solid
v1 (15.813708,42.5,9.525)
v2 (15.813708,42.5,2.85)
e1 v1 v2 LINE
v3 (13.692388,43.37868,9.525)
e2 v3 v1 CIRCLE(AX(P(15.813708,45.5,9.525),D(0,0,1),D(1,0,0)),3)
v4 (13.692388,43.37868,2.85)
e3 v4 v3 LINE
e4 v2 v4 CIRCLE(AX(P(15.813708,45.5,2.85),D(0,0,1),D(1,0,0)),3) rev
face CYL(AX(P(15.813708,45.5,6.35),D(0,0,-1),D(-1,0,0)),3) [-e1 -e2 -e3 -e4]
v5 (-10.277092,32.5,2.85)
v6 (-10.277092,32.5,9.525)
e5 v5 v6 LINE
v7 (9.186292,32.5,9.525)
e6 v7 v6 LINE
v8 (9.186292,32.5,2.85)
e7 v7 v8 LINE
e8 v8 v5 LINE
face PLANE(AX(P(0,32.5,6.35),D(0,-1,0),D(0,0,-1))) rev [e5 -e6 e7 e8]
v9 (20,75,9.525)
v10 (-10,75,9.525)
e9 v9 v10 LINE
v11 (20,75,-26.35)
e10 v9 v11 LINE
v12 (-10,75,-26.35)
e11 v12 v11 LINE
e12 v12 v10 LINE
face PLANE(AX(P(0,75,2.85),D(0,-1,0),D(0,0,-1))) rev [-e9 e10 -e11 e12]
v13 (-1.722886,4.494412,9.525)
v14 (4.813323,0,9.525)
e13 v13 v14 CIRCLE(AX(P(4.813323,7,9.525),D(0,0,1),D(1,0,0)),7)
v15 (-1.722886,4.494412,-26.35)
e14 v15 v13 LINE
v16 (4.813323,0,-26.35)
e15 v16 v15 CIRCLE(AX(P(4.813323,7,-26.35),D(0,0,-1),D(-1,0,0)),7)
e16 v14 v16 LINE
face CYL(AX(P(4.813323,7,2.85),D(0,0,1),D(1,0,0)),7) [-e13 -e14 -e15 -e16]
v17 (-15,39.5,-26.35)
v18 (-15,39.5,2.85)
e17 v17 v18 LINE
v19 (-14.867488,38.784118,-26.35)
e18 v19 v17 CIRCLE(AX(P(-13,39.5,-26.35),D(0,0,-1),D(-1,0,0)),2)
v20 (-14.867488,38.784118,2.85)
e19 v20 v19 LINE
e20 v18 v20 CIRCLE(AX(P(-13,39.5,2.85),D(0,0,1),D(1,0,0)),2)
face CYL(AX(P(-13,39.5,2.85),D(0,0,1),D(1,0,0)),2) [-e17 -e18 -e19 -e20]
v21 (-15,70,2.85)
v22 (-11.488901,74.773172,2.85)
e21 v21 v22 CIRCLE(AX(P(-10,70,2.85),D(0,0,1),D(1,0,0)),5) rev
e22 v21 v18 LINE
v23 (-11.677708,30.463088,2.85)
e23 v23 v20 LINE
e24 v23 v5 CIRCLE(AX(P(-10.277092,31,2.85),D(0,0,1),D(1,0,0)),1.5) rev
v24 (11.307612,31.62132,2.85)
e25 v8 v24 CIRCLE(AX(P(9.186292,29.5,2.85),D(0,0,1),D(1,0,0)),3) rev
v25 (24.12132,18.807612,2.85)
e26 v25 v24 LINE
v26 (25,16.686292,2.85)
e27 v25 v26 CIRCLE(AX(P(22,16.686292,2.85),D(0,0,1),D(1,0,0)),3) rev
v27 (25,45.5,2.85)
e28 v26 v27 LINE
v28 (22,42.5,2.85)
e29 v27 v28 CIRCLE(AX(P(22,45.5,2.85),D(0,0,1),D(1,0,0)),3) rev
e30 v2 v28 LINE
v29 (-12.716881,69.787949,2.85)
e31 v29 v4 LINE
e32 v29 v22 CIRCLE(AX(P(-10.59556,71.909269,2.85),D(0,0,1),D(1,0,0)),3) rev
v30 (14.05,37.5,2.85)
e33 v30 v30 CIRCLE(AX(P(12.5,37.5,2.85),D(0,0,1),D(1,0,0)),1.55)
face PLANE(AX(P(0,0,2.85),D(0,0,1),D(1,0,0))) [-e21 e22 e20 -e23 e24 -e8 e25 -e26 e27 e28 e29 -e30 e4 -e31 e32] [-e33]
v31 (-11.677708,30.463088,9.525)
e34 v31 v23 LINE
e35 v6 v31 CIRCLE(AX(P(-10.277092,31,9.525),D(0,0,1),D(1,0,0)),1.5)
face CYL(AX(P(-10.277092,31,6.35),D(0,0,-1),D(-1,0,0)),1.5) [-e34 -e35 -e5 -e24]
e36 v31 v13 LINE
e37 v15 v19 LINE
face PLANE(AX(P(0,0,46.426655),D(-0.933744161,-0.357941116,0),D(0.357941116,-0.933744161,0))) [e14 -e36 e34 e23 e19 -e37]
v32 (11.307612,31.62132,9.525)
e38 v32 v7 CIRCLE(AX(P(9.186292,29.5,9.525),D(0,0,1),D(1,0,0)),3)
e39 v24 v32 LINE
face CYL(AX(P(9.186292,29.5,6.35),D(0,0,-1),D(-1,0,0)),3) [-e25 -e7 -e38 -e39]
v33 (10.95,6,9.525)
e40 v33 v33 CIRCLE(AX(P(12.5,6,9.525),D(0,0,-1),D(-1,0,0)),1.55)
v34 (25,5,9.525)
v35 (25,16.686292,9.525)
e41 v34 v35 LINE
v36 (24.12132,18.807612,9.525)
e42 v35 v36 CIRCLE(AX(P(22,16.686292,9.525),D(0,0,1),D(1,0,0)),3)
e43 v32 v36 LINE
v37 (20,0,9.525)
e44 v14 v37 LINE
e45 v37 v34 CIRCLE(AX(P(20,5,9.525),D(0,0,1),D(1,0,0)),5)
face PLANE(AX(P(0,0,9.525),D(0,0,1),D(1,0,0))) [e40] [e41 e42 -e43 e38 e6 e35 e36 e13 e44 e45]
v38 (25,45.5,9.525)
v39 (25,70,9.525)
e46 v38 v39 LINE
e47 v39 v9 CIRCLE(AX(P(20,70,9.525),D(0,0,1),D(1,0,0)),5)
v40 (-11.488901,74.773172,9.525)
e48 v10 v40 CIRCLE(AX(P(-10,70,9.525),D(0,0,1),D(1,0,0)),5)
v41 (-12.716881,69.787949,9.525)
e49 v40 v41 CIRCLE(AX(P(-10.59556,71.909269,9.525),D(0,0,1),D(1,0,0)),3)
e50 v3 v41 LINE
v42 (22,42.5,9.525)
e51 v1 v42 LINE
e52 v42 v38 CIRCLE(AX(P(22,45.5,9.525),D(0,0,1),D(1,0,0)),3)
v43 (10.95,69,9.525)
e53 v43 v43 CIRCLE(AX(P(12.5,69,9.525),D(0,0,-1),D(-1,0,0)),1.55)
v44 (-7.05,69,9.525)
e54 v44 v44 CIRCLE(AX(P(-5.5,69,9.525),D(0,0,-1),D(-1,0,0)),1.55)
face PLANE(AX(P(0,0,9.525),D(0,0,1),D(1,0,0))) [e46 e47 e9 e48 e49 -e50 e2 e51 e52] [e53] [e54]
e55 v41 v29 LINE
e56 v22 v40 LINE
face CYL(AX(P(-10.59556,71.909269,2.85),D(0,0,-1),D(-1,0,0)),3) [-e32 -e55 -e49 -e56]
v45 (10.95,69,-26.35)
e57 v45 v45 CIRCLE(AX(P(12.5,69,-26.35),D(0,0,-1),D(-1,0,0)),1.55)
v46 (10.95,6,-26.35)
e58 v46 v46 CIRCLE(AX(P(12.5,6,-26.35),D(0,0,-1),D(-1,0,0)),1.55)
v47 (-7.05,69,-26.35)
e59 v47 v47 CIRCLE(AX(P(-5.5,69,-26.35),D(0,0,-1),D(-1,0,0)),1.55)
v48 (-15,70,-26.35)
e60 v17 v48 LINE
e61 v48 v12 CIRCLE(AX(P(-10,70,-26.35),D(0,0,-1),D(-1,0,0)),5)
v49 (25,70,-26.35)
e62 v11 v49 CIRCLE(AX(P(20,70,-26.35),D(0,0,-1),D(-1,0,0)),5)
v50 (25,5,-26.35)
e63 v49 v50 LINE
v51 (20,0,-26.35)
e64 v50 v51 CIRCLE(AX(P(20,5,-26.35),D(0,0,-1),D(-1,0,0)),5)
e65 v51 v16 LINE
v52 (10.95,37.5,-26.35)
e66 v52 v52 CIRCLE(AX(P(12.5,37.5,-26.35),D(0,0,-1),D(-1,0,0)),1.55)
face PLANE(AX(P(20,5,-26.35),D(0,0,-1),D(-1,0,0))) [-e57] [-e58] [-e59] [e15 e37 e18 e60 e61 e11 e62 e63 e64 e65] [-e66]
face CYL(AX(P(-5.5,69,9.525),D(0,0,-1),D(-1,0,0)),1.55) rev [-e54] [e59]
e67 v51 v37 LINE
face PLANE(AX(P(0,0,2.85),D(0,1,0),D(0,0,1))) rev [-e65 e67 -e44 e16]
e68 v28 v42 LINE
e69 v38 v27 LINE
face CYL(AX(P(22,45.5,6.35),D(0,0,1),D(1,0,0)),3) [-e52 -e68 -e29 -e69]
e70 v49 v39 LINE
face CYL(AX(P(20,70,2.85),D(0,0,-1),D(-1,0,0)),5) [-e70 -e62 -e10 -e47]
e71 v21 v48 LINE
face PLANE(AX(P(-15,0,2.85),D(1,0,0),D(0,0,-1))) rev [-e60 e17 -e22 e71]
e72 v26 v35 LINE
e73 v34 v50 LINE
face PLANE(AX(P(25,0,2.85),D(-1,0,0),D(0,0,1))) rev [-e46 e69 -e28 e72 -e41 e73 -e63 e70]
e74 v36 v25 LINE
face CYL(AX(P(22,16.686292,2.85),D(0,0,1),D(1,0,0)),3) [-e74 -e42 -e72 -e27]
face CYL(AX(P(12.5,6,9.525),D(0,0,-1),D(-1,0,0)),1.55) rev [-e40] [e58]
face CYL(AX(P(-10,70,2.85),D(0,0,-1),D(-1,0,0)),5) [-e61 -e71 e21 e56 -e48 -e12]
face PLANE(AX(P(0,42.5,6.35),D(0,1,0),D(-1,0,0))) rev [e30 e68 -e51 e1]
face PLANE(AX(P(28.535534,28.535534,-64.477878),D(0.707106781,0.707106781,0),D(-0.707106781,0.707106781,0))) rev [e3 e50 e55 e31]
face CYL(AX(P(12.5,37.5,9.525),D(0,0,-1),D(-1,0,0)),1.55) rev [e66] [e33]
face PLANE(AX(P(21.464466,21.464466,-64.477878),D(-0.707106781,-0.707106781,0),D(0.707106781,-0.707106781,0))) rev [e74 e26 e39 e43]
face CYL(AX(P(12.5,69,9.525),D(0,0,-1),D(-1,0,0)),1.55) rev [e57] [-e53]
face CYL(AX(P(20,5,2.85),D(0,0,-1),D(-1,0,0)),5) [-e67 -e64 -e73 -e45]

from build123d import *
from build123d.topology import SkipClean

# Parameters (mm, degrees)
SKETCH1_R           = 1.5
SKETCH1_W           = 15
SKETCH1_H           = 37.5
BOSS_EXTRUDE1_DEPTH = 2.85
FILLET1_R           = 5
FILLET2_R           = 2
BOSS_EXTRUDE2_START = 3.5
SKETCH5_R           = 1.5
BOSS_EXTRUDE2_DEPTH = 3.5
FILLET3_R           = 3.5
FILLET4_R           = 2
FILLET5_R           = 2
SKETCH6_R           = 1.5
CUT_EXTRUDE1_DEPTH  = 10
SKETCH8_R           = 1.5
BOSS_EXTRUDE3_DEPTH = 6.35
BOSS_EXTRUDE4_START = 3.175
SKETCH9_R           = 1.5
BOSS_EXTRUDE4_DEPTH = 3.175
SKETCH10_W          = 40
SKETCH10_H          = 15.399494937
SKETCH10_W_2        = 25
BOSS_EXTRUDE5_DEPTH = 6.675
CUT_EXTRUDE2_START  = -6.675
CUT_EXTRUDE2_DEPTH  = 6.675
BOSS_EXTRUDE6_START = -9.2
BOSS_EXTRUDE6_DEPTH = 9.2
FILLET6_R           = 7
BOSS_EXTRUDE7_DEPTH = 6.675
FILLET7_R           = 3
FILLET8_R           = 1.5
SKETCH14_R          = 1.5
CUT_EXTRUDE3_DEPTH  = 81.63507689
SKETCH15_R          = 1.55
CUT_EXTRUDE4_DEPTH  = 81.63507689
BOSS_EXTRUDE8_START = 20
SKETCH16_R          = 1.55
BOSS_EXTRUDE8_DEPTH = 20


# Read off the part's stored shape, not the designer's step: Cut-Extrude2
with BuildPart() as part:
    # Sketch1 → Boss-Extrude1 (new body)
    # profile 1 of 2: a face of its own
    with BuildSketch(Plane.XY):
        Polygon((0, 37.5), (0, 0), (25, 0), (25, 75), (0, 75), align=None)
        with Locations((12.5, 6)):
            Circle(SKETCH1_R, mode=Mode.SUBTRACT)
        with Locations((12.5, 37.5)):
            Circle(SKETCH1_R, mode=Mode.SUBTRACT)
        with Locations((12.5, 69)):
            Circle(SKETCH1_R, mode=Mode.SUBTRACT)
    # profile 2 of 2: a face of its own
    with BuildSketch(Plane.XY):
        with Locations((-7.5, 56.25)):
            Rectangle(SKETCH1_W, SKETCH1_H)
    extrude(amount=BOSS_EXTRUDE1_DEPTH)

    # Fillet1
    fillet1_edges = [part.edges().sort_by_distance(p)[0] for p in [
        (25, 75, 1.425),
        (25, 0, 1.425),
        (0, 0, 1.425),
        (0, 37.5, 1.425),
        (-15, 75, 1.425),
    ]]
    fillet(fillet1_edges, radius=FILLET1_R)

    # Fillet2
    fillet2_edges = [part.edges().sort_by_distance(p)[0] for p in [
        (-15, 37.5, 1.425),
    ]]
    fillet(fillet2_edges, radius=FILLET2_R)

    # Sketch5 → Boss-Extrude2 (add)
    # profile 1 of 2: a face of its own
    with BuildSketch(Plane.XY.offset(2.85).offset(BOSS_EXTRUDE2_START)):
        with BuildLine():
            Line((-15, 42.5), (10.428932188, 42.5))
            Line((10.428932188, 42.5), (21.464466094, 53.535533906))
            Line((21.464466094, 53.535533906), (25, 57.071067812))
            Line((25, 57.071067812), (25, 70))
            ThreePointArc((25, 70), (23.535533906, 73.535533906), (20, 75))
            Line((20, 75), (-10, 75))
            ThreePointArc((-10, 75), (-13.535533906, 73.535533906), (-15, 70))
            Line((-15, 70), (-15, 42.5))
        make_face()
        with Locations((12.5, 69)):
            Circle(SKETCH5_R, mode=Mode.SUBTRACT)
    # profile 2 of 2: a face of its own
    with BuildSketch(Plane.XY.offset(2.85).offset(BOSS_EXTRUDE2_START)):
        with BuildLine():
            Line((14.571067812, 32.5), (0, 17.928932188))
            Line((0, 17.928932188), (0, 5))
            ThreePointArc((0, 5), (1.464466094, 1.464466094), (5, 0))
            Line((5, 0), (20, 0))
            ThreePointArc((20, 0), (23.535533906, 1.464466094), (25, 5))
            Line((25, 5), (25, 32.5))
            Line((25, 32.5), (14.571067812, 32.5))
        make_face()
        with Locations((12.5, 6)):
            Circle(SKETCH5_R, mode=Mode.SUBTRACT)
    extrude(amount=-BOSS_EXTRUDE2_DEPTH)

    # Fillet3
    fillet3_edges = [part.edges().sort_by_distance(p)[0] for p in [
        (10.428932188, 42.5, 4.6),
        (14.571067812, 32.5, 4.6),
    ]]
    fillet(fillet3_edges, radius=FILLET3_R)

    # Fillet4
    fillet4_edges = [part.edges().sort_by_distance(p)[0] for p in [
        (-15, 42.5, 4.6),
    ]]
    fillet(fillet4_edges, radius=FILLET4_R)

    # Fillet5
    fillet5_edges = [part.edges().sort_by_distance(p)[0] for p in [
        (25, 57.071067812, 4.6),
        (25, 32.5, 4.6),
        (0, 17.928932188, 4.6),
    ]]
    fillet(fillet5_edges, radius=FILLET5_R)

    # Sketch6 → Cut-Extrude1 (cut)
    with BuildSketch(Plane.XY.offset(6.35)):
        with Locations((-5.5, 69)):
            Circle(SKETCH6_R)
    extrude(amount=-CUT_EXTRUDE1_DEPTH, mode=Mode.SUBTRACT)

    # Sketch8 → Boss-Extrude3 (add)
    with SkipClean():  # the faces are left unmerged after this step: merging them gives an invalid solid
        with BuildSketch(Plane(origin=(0, 0, 0), x_dir=(-1, 0, 0), z_dir=(0, 0, -1))):
            with BuildLine():
                ThreePointArc((0, 32.5), (1.464466094, 36.035533906), (5, 37.5))
                Line((5, 37.5), (13, 37.5))
                ThreePointArc((13, 37.5), (14.414213562, 38.085786438), (15, 39.5))
                Line((15, 39.5), (15, 70))
                ThreePointArc((15, 70), (13.535533906, 73.535533906), (10, 75))
                Line((10, 75), (-20, 75))
                ThreePointArc((-20, 75), (-23.535533906, 73.535533906), (-25, 70))
                Line((-25, 70), (-25, 5))
                ThreePointArc((-25, 5), (-23.535533906, 1.464466094), (-20, 0))
                Line((-20, 0), (-5, 0))
                ThreePointArc((-5, 0), (-1.464466094, 1.464466094), (0, 5))
                Line((0, 5), (0, 32.5))
            make_face()
            with Locations((-12.5, 6)):
                Circle(SKETCH8_R, mode=Mode.SUBTRACT)
            with Locations((-12.5, 69)):
                Circle(SKETCH8_R, mode=Mode.SUBTRACT)
            with Locations((-12.5, 37.5)):
                Circle(SKETCH8_R, mode=Mode.SUBTRACT)
            with Locations(Location((5.5, 69, 0), (0, 0, 180))):
                Circle(SKETCH8_R, mode=Mode.SUBTRACT)
        extrude(amount=BOSS_EXTRUDE3_DEPTH)
    add(part.part.scale(1), mode=Mode.REPLACE)  # the faces are merged on a copy

    # Sketch9 → Boss-Extrude4 (add)
    # profile 1 of 2: a face of its own
    with BuildSketch(Plane.XY.offset(6.35).offset(BOSS_EXTRUDE4_START)):
        with BuildLine():
            ThreePointArc((16.02081528, 32.5), (14.681423267, 32.233578364), (13.545941546, 31.474873734))
            Line((13.545941546, 31.474873734), (0.585786438, 18.514718626))
            ThreePointArc((0.585786438, 18.514718626), (0.152240935, 17.865871928), (0, 17.100505063))
            Line((0, 17.100505063), (0, 5))
            ThreePointArc((0, 5), (1.464466094, 1.464466094), (5, 0))
            Line((5, 0), (20, 0))
            ThreePointArc((20, 0), (23.535533906, 1.464466094), (25, 5))
            Line((25, 5), (25, 30.5))
            ThreePointArc((25, 30.5), (24.414213562, 31.914213562), (23, 32.5))
            Line((23, 32.5), (16.02081528, 32.5))
        make_face()
    # profile 2 of 2: a face of its own
    with BuildSketch(Plane.XY.offset(6.35).offset(BOSS_EXTRUDE4_START)):
        with BuildLine():
            ThreePointArc((8.97918472, 42.5), (10.318576733, 42.766421636), (11.454058454, 43.525126266))
            Line((11.454058454, 43.525126266), (24.414213562, 56.485281374))
            ThreePointArc((24.414213562, 56.485281374), (24.847759065, 57.134128072), (25, 57.899494937))
            Line((25, 57.899494937), (25, 70))
            ThreePointArc((25, 70), (23.535533906, 73.535533906), (20, 75))
            Line((20, 75), (-10, 75))
            ThreePointArc((-10, 75), (-13.535533906, 73.535533906), (-15, 70))
            Line((-15, 70), (-15, 44.5))
            ThreePointArc((-15, 44.5), (-14.414213562, 43.085786438), (-13, 42.5))
            Line((-13, 42.5), (8.97918472, 42.5))
        make_face()
        with Locations((-5.5, 69)):
            Circle(SKETCH9_R, mode=Mode.SUBTRACT)
        with Locations((12.5, 69)):
            Circle(SKETCH9_R, mode=Mode.SUBTRACT)
    extrude(amount=-BOSS_EXTRUDE4_DEPTH)

    # Sketch10 → Boss-Extrude5 (add)
    with SkipClean():  # the faces are left unmerged after this step: merging them gives an invalid solid
        with BuildSketch(Plane.XY.offset(9.525)):
            with Locations((5, 50.199747469)):
                Rectangle(SKETCH10_W, SKETCH10_H)
            with Locations((12.5, 24.800252531)):
                Rectangle(SKETCH10_W_2, SKETCH10_H)
        extrude(amount=-BOSS_EXTRUDE5_DEPTH)

    # Cut-Extrude2 outline → Cut-Extrude2 (cut)
    with SkipClean():  # the faces are left unmerged after this step: merging them gives an invalid solid
        with BuildSketch(Plane.XY.offset(9.525).offset(CUT_EXTRUDE2_START)):
            Polygon((25, 32.5), (10.428932188, 32.5), (25, 17.928932188), align=None)
            with BuildLine():
                Line((-15, 42.5), (14.571067812, 42.5))
                Line((14.571067812, 42.5), (-14.682437359, 71.75350517))
                ThreePointArc((-14.682437359, 71.75350517), (-14.919968841, 70.891014367), (-15, 70))
                Line((-15, 70), (-15, 42.5))
            make_face()
        extrude(amount=CUT_EXTRUDE2_DEPTH, mode=Mode.SUBTRACT)

    # Sketch12 → Boss-Extrude6 (add)
    with BuildSketch(Plane(origin=(0, 0, -6.35), x_dir=(-1, 0, 0), z_dir=(0, 0, -1)).offset(BOSS_EXTRUDE6_START)):
        with BuildLine():
            Line((0, 0), (14.867488321, 38.784117768))
            ThreePointArc((14.867488321, 38.784117768), (14.133189202, 37.852006604), (13, 37.5))
            Line((13, 37.5), (5, 37.5))
            ThreePointArc((5, 37.5), (1.464466094, 36.035533906), (0, 32.5))
            Line((0, 32.5), (0, 5))
            ThreePointArc((0, 5), (-1.464466094, 1.464466094), (-5, 0))
            Line((-5, 0), (0, 0))
        make_face()
    extrude(amount=BOSS_EXTRUDE6_DEPTH)

    # Fillet6
    fillet6_edges = [part.edges().sort_by_distance(p)[0] for p in [
        (0, 0, -1.75),
    ]]
    fillet(fillet6_edges, radius=FILLET6_R)

    # Sketch13 → Boss-Extrude7 (add)
    with SkipClean():  # the faces are left unmerged after this step: merging them gives an invalid solid
        with BuildSketch(Plane.XY.offset(9.525)):
            with BuildLine():
                Line((0, 32.5), (0, 5))
                ThreePointArc((0, 5), (1.464466094, 1.464466094), (5, 0))
                Line((5, 0), (4.813322939, 0))
                ThreePointArc((4.813322939, 0), (0.847160732, 1.232023115), (-1.722886185, 4.494412187))
                Line((-1.722886185, 4.494412187), (-12.458537109, 32.5))
                Line((-12.458537109, 32.5), (0, 32.5))
            make_face()
        extrude(amount=-BOSS_EXTRUDE7_DEPTH)

    # Fillet7
    fillet7_edges = [part.edges().sort_by_distance(p)[0] for p in [
        (25, 42.5, 6.1875),
        (14.571067812, 42.5, 6.1875),
        (-14.682437359, 71.75350517, 4.6),
        (10.428932188, 32.5, 6.1875),
        (25, 17.928932188, 6.1875),
    ]]
    fillet(fillet7_edges, radius=FILLET7_R)

    # Fillet8
    # the kernel refuses this fillet: 1.5 mm, written as the material it takes off along each edge
    with BuildSketch(Plane(origin=(-12.458537109, 32.5, 14.978612885), x_dir=(0.35794111613384066, -0.9337441605605148, 0), z_dir=(0, 0, -1))) as fillet8_piece_1:
        with BuildLine():
            CenterArc((FILLET8_R * 1.45429676938, -FILLET8_R), FILLET8_R, 90, 110.97380664)
            Line((FILLET8_R * 0.520552608823, -FILLET8_R * 1.35794111613), (0, 0))
            Line((0, 0), (FILLET8_R * 1.45429676938, 0))
        make_face()
    extrude(amount=12.128612885, mode=Mode.SUBTRACT)

    # Sketch14 → Cut-Extrude3 (cut, through all)
    with SkipClean():  # the faces are left unmerged after this step: merging them gives an invalid solid
        with BuildSketch(Plane(origin=(0, 0, -6.35), x_dir=(-1, 0, 0), z_dir=(0, 0, -1))):
            with Locations((-12.5, 6)):
                Circle(SKETCH14_R)
        extrude(amount=-CUT_EXTRUDE3_DEPTH, mode=Mode.SUBTRACT)
    add(part.part.scale(1), mode=Mode.REPLACE)  # the faces are merged on a copy

    # Sketch15 → Cut-Extrude4 (cut, through all)
    with BuildSketch(Plane(origin=(0, 0, -6.35), x_dir=(-1, 0, 0), z_dir=(0, 0, -1))):
        with Locations((-12.5, 69)):
            Circle(SKETCH15_R)
        with Locations((5.5, 69)):
            Circle(SKETCH15_R)
        with Locations((-12.5, 37.5)):
            Circle(SKETCH15_R)
        with Locations((-12.5, 6)):
            Circle(SKETCH15_R)
    extrude(amount=-CUT_EXTRUDE4_DEPTH, mode=Mode.SUBTRACT)

    # Sketch16 → Boss-Extrude8 (add)
    with BuildSketch(Plane(origin=(0, 0, -6.35), x_dir=(-1, 0, 0), z_dir=(0, 0, -1)).offset(BOSS_EXTRUDE8_START)):
        with BuildLine():
            Line((-20, 0), (-4.813322939, 0))
            ThreePointArc((-4.813322939, 0), (-0.847160732, 1.232023115), (1.722886185, 4.494412187))
            Line((1.722886185, 4.494412187), (14.867488321, 38.784117768))
            ThreePointArc((14.867488321, 38.784117768), (14.966593075, 39.135978464), (15, 39.5))
            Line((15, 39.5), (15, 70))
            ThreePointArc((15, 70), (13.535533906, 73.535533906), (10, 75))
            Line((10, 75), (-20, 75))
            ThreePointArc((-20, 75), (-23.535533906, 73.535533906), (-25, 70))
            Line((-25, 70), (-25, 5))
            ThreePointArc((-25, 5), (-23.535533906, 1.464466094), (-20, 0))
        make_face()
        with Locations((-12.5, 6)):
            Circle(SKETCH16_R, mode=Mode.SUBTRACT)
        with Locations((-12.5, 37.5)):
            Circle(SKETCH16_R, mode=Mode.SUBTRACT)
        with Locations((5.5, 69)):
            Circle(SKETCH16_R, mode=Mode.SUBTRACT)
        with Locations((-12.5, 69)):
            Circle(SKETCH16_R, mode=Mode.SUBTRACT)
    extrude(amount=-BOSS_EXTRUDE8_DEPTH)


solid = part.part
